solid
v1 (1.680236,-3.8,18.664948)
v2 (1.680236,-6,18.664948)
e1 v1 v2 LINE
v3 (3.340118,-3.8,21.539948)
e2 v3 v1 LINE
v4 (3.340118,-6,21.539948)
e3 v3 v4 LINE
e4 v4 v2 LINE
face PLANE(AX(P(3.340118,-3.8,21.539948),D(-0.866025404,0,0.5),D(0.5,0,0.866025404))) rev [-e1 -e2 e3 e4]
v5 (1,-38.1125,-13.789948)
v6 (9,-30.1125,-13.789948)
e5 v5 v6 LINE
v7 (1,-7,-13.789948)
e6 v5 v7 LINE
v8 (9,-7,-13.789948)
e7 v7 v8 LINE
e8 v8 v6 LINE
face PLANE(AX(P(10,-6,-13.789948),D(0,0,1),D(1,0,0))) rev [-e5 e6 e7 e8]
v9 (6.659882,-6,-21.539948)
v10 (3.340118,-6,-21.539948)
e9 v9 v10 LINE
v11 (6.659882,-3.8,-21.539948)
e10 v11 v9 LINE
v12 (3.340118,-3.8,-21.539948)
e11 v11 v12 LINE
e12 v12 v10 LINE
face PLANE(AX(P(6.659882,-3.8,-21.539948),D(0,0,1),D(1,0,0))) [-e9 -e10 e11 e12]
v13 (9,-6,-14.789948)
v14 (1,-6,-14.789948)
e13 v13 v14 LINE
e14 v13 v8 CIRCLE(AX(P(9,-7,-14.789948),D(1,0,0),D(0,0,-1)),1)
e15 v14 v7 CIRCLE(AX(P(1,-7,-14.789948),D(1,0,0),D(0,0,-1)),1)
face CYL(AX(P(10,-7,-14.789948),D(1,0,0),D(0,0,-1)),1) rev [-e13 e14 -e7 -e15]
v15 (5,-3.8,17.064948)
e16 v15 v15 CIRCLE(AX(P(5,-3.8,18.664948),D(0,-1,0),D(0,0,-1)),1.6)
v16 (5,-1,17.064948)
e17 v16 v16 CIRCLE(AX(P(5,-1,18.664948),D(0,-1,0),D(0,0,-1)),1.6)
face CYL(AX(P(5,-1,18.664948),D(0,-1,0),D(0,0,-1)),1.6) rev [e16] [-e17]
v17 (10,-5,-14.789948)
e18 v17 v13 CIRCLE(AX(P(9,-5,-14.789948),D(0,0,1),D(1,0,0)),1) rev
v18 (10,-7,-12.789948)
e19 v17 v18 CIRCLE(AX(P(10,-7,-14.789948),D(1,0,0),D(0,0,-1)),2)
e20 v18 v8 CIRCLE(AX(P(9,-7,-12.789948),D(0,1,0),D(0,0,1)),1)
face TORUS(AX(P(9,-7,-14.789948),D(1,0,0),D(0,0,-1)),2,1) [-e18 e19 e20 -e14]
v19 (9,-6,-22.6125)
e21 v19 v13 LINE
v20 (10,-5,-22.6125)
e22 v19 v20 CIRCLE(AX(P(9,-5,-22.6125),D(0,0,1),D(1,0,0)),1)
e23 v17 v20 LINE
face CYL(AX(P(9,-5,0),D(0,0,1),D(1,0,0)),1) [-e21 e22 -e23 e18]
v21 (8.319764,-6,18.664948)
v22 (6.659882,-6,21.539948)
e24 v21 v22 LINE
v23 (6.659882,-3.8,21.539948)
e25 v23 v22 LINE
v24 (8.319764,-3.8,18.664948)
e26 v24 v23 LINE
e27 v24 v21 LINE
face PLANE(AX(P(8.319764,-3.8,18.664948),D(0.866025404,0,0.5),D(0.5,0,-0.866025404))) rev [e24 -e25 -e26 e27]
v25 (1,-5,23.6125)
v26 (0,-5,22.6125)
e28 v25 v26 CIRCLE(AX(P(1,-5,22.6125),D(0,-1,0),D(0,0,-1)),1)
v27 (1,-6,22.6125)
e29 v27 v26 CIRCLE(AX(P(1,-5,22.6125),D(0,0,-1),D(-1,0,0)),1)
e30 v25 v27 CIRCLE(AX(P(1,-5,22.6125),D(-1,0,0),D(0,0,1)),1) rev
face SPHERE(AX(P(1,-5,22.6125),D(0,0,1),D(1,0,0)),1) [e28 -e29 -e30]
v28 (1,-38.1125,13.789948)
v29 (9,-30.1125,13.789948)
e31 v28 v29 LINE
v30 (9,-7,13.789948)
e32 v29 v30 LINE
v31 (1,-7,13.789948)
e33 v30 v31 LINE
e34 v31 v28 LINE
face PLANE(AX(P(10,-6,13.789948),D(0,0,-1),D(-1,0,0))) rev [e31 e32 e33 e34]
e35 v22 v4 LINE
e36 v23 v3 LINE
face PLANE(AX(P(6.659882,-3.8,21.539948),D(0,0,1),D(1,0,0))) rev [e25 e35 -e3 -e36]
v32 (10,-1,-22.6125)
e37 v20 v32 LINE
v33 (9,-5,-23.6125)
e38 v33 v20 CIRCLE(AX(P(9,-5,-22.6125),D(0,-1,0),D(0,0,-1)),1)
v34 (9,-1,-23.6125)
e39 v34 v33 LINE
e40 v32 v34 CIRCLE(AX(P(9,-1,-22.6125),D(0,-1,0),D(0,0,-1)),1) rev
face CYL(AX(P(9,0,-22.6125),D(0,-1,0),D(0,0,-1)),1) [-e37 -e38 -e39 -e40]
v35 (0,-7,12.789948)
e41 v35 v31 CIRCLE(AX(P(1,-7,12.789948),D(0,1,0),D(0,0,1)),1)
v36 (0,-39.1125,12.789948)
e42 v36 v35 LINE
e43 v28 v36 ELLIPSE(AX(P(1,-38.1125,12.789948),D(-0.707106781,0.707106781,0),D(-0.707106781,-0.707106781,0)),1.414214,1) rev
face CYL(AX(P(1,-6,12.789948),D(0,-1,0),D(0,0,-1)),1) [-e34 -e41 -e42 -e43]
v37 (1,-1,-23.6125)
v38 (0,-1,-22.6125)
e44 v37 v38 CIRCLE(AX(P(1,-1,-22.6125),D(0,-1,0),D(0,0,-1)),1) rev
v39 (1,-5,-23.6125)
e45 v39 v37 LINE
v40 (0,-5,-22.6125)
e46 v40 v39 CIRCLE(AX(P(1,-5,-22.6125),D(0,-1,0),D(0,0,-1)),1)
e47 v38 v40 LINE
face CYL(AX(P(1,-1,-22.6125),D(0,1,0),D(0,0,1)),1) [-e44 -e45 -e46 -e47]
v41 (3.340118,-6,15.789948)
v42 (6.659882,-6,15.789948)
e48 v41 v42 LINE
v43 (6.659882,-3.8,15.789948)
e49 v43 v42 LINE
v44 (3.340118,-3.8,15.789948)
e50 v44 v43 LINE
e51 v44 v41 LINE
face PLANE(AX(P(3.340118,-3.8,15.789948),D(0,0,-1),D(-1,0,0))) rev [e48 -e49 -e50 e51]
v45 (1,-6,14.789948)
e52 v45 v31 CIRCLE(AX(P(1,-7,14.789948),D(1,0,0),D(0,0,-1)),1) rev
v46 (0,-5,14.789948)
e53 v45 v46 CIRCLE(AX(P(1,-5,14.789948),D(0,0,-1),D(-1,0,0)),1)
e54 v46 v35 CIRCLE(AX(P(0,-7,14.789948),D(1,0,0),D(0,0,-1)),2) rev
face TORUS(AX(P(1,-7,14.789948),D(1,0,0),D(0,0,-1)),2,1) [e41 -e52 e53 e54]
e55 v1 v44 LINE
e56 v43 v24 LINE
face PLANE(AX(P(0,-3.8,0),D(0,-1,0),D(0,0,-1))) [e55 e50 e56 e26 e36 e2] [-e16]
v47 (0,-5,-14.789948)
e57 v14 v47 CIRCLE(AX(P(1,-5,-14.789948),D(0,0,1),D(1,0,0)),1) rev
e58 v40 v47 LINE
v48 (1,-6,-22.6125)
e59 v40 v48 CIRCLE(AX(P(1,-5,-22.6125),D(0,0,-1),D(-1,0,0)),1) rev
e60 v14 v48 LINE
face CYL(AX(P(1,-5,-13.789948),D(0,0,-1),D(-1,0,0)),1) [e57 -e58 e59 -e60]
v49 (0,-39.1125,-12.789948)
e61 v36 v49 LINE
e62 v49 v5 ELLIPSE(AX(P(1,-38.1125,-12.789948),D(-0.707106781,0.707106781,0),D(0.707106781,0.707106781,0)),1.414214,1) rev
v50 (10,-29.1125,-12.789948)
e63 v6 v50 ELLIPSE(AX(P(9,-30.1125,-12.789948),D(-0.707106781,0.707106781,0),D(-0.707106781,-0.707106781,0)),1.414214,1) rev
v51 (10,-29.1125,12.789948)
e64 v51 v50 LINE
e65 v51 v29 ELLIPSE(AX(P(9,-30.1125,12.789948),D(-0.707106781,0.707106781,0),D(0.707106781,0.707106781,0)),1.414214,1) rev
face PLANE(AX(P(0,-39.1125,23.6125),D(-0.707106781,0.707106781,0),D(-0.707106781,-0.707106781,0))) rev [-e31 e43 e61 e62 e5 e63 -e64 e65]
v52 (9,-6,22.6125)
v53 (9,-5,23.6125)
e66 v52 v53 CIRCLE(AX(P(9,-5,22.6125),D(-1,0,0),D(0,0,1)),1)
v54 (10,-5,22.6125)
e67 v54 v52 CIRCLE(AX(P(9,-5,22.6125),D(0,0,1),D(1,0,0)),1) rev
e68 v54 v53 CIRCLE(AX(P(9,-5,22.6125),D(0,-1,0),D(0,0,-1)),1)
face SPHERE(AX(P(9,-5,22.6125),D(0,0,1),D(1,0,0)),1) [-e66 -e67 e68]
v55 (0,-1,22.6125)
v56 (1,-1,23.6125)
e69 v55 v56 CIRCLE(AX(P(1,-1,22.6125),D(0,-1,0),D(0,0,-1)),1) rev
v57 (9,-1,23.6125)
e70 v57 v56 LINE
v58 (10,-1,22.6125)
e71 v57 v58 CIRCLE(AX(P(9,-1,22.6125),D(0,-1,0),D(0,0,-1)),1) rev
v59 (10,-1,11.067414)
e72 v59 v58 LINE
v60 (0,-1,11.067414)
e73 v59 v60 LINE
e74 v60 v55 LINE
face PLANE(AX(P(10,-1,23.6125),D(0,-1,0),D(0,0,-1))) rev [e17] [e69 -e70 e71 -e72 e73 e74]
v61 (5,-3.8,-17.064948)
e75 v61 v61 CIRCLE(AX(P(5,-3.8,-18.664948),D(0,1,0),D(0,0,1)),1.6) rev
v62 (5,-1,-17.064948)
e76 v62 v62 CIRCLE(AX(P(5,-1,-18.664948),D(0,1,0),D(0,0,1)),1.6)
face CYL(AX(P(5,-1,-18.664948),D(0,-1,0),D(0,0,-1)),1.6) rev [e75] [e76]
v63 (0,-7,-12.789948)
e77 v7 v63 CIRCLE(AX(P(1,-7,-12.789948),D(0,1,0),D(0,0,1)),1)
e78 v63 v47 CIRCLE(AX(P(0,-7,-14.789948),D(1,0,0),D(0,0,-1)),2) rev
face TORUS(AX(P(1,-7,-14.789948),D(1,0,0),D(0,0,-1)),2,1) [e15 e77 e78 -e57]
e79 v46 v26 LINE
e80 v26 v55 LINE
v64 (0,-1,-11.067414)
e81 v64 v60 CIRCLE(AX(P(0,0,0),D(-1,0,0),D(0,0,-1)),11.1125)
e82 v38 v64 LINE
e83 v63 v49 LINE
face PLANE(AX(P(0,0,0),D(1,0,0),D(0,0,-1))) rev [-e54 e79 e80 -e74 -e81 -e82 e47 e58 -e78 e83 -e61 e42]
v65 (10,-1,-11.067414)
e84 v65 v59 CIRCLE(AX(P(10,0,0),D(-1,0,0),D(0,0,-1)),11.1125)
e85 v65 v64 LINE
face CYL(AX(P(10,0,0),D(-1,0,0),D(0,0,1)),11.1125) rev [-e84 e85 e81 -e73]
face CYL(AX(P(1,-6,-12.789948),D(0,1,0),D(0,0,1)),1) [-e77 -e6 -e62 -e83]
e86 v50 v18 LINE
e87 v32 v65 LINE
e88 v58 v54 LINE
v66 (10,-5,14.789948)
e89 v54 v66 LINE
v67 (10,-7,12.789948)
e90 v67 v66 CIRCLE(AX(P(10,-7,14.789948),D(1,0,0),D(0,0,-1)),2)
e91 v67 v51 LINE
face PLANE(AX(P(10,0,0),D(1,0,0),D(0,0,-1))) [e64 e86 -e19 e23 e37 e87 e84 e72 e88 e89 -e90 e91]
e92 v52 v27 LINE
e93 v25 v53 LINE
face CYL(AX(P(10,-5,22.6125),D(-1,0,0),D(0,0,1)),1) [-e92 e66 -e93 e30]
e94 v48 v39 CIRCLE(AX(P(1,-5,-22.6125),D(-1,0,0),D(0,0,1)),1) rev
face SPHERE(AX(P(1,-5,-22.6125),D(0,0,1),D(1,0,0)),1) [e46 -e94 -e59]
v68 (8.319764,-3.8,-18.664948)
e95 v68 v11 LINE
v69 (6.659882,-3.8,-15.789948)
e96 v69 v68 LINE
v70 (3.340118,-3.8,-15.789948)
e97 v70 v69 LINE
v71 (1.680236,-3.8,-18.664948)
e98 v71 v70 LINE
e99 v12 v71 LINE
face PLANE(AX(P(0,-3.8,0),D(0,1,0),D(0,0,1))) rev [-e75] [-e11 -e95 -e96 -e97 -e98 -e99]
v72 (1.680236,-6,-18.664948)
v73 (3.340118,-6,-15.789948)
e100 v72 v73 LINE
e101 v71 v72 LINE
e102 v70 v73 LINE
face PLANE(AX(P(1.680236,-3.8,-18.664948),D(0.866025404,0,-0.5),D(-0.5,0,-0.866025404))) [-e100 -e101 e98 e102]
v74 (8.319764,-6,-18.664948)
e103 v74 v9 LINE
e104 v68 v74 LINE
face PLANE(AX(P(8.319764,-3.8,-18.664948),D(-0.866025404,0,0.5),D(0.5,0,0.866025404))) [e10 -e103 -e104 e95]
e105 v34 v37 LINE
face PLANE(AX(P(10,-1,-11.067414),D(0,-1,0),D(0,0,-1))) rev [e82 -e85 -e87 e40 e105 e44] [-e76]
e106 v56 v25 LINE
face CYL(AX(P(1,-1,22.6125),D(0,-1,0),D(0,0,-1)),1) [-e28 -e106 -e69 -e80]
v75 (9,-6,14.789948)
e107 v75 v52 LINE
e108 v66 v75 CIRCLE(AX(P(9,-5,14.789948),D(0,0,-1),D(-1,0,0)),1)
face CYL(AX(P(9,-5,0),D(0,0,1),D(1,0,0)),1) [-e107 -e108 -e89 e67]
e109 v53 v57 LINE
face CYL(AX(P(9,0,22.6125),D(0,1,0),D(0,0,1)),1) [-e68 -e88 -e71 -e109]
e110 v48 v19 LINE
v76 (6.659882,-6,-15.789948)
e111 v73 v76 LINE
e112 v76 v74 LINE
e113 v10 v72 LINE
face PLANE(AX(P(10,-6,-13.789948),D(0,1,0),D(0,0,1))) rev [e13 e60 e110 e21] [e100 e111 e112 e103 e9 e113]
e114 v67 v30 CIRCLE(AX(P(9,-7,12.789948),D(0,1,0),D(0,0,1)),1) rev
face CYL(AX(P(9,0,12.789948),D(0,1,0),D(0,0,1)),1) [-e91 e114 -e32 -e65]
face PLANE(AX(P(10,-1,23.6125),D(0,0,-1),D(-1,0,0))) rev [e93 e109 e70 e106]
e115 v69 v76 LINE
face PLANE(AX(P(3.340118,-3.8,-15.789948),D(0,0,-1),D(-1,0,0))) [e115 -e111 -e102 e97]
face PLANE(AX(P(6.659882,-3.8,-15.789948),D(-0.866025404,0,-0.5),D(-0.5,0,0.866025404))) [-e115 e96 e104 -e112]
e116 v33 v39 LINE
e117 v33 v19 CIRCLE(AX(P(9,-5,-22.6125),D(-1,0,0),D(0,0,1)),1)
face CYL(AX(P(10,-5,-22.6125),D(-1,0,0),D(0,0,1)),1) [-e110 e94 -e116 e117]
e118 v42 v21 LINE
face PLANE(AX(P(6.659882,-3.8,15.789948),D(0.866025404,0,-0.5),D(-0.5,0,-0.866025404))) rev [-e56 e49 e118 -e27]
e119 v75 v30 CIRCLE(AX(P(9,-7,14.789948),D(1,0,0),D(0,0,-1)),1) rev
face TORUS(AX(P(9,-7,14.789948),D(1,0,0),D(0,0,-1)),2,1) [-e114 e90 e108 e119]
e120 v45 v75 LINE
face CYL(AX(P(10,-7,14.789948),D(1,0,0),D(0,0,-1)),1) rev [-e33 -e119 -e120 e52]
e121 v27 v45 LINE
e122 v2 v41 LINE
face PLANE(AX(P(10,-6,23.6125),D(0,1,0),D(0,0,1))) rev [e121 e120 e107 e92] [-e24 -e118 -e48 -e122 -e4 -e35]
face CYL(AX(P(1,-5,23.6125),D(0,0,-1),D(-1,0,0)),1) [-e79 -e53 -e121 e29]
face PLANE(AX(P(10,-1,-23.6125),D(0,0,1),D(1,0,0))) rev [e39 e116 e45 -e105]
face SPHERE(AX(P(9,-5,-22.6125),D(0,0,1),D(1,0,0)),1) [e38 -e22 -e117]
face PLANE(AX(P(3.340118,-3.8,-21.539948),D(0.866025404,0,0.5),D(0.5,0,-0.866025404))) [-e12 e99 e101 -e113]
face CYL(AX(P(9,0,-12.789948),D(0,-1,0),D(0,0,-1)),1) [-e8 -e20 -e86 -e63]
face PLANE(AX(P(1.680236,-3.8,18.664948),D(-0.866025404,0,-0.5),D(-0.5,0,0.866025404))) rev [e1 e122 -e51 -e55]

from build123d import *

# Parameters (mm, degrees)
CLAMP_EXTRUDE_DEPTH = 10
CUT_EXTRUDE3_DEPTH  = 56.03390543
FILLET2_R           = 1
FILLET3_R           = 1
CUT_EXTRUDE4_DEPTH  = 2.2
HOLE_5_R            = 1.6
CUT_EXTRUDE5_DEPTH  = 42.880637682


with BuildPart() as part:
    # Sketch4 → Clamp Extrude (new body)
    with BuildSketch(Plane(origin=(0, 0, 0), x_dir=(0, 0, -1), z_dir=(1, 0, 0))):
        with BuildLine():
            Line((-23.612500003, -1), (-23.612500003, -6))
            Line((-23.612500003, -6), (-13.789947652, -6))
            Line((-13.789947652, -6), (-13.789947652, -39.1125))
            Line((-13.789947652, -39.1125), (13.789947652, -39.1125))
            Line((13.789947652, -39.1125), (13.789947652, -6))
            Line((13.789947652, -6), (23.612500003, -6))
            Line((23.612500003, -6), (23.612500003, -1))
            Line((23.612500003, -1), (11.067414163, -1))
            ThreePointArc((11.067414163, -1), (0, -11.1125), (-11.067414163, -1))
            Line((-11.067414163, -1), (-23.612500003, -1))
        make_face()
    extrude(amount=CLAMP_EXTRUDE_DEPTH)

    # Sketch10 → Cut-Extrude3 (cut, through all)
    with BuildSketch(Plane(origin=(0, 0, -13.789947652), x_dir=(-1, 0, 0), z_dir=(0, 0, -1))):
        Polygon((0, -39.1125), (-10, -29.1125), (-10, -39.1125), align=None)
    extrude(amount=-CUT_EXTRUDE3_DEPTH, mode=Mode.SUBTRACT)

    # Fillet2
    fillet2_edges = [part.edges().sort_by_distance(p)[0] for p in [
        (0, -6, 18.701223827),
        (0, -6, -18.701223827),
        (0, -22.55625, -13.789947652),
        (0, -22.55625, 13.789947652),
        (10, -6, -18.701223827),
        (5, -6, 13.789947652),
        (5, -6, 23.612500003),
        (5, -6, -23.612500003),
        (5, -6, -13.789947652),
        (10, -17.55625, -13.789947652),
        (10, -6, 18.701223827),
        (10, -17.55625, 13.789947652),
    ]]
    fillet(fillet2_edges, radius=FILLET2_R)

    # Fillet3
    # the kernel refuses this fillet: 1 mm, written as the material it takes off along each edge
    with BuildSketch(Plane(origin=(1, -5, 22.612500003), x_dir=(-1, 0, 0), z_dir=(0, 0, 1))) as fillet3_piece_1_section:
        Polygon((0, 0), (FILLET3_R, 0), (FILLET3_R, FILLET3_R), (0, FILLET3_R), align=None)
    fillet3_piece_1 = extrude(amount=FILLET3_R, mode=Mode.PRIVATE)
    fillet3_piece_1 = fillet3_piece_1 - Plane(origin=(1, -5, 22.612500003), x_dir=(0.7071067811865475, 0.7071067811865475, 0), z_dir=(0, 0, 1)) * Sphere(FILLET3_R, mode=Mode.PRIVATE)
    add(fillet3_piece_1, mode=Mode.SUBTRACT)
    with BuildSketch(Plane(origin=(9, -5, 22.612500003), x_dir=(1, 0, 0), z_dir=(0, 0, 1))) as fillet3_piece_2_section:
        Polygon((0, 0), (FILLET3_R, 0), (FILLET3_R, -FILLET3_R), (0, -FILLET3_R), align=None)
    fillet3_piece_2 = extrude(amount=FILLET3_R, mode=Mode.PRIVATE)
    fillet3_piece_2 = fillet3_piece_2 - Plane(origin=(9, -5, 22.612500003), x_dir=(-0.7071067811865475, 0.7071067811865475, 0), z_dir=(0, 0, 1)) * Sphere(FILLET3_R, mode=Mode.PRIVATE)
    add(fillet3_piece_2, mode=Mode.SUBTRACT)
    with BuildSketch(Plane(origin=(9, -5, -22.612500003), x_dir=(0, 0, -1), z_dir=(1, 0, 0))) as fillet3_piece_3_section:
        Polygon((0, 0), (FILLET3_R, 0), (FILLET3_R, -FILLET3_R), (0, -FILLET3_R), align=None)
    fillet3_piece_3 = extrude(amount=FILLET3_R, mode=Mode.PRIVATE)
    fillet3_piece_3 = fillet3_piece_3 - Plane(origin=(9, -5, -22.612500003), x_dir=(0, 0.7071067811865475, 0.7071067811865475), z_dir=(1, 0, 0)) * Sphere(FILLET3_R, mode=Mode.PRIVATE)
    add(fillet3_piece_3, mode=Mode.SUBTRACT)
    with BuildSketch(Plane(origin=(1, -5, -22.612500003), x_dir=(0, 0, -1), z_dir=(-1, 0, 0))) as fillet3_piece_4_section:
        Polygon((0, 0), (FILLET3_R, 0), (FILLET3_R, FILLET3_R), (0, FILLET3_R), align=None)
    fillet3_piece_4 = extrude(amount=FILLET3_R, mode=Mode.PRIVATE)
    fillet3_piece_4 = fillet3_piece_4 - Plane(origin=(1, -5, -22.612500003), x_dir=(0, 0.7071067811865475, 0.7071067811865475), z_dir=(-1, 0, 0)) * Sphere(FILLET3_R, mode=Mode.PRIVATE)
    add(fillet3_piece_4, mode=Mode.SUBTRACT)
    with BuildSketch(Plane(origin=(0, 1.5, 23.612500003), x_dir=(1, 0, 0), z_dir=(0, -1, 0)), Plane(origin=(10, -5, -23.612500003), x_dir=(0, 0, 1), z_dir=(0, 1, 0))) as fillet3_piece_5:
        with BuildLine():
            CenterArc((FILLET3_R, -FILLET3_R), FILLET3_R, 90, 90)
            Line((0, -FILLET3_R), (0, 0))
            Line((0, 0), (FILLET3_R, 0))
        make_face()
    extrude(amount=6.5, mode=Mode.SUBTRACT)
    with BuildSketch(Plane(origin=(10, 1.5, 23.612500003), x_dir=(-1, 0, 0), z_dir=(0, -1, 0)), Plane(origin=(0, -5, -23.612500003), x_dir=(0, 0, 1), z_dir=(0, 1, 0))) as fillet3_piece_6:
        with BuildLine():
            CenterArc((FILLET3_R, FILLET3_R), FILLET3_R, 180, 90)
            Line((0, FILLET3_R), (0, 0))
            Line((0, 0), (FILLET3_R, 0))
        make_face()
    extrude(amount=6.5, mode=Mode.SUBTRACT)

    # Hole → Cut-Extrude4 (cut)
    with BuildSketch(Plane.XZ.offset(6)):
        Polygon((8.319764048, 18.664947652), (6.659882024, 21.539947652), (3.340117976, 21.539947652), (1.680235952, 18.664947652), (3.340117976, 15.789947652), (6.659882024, 15.789947652), align=None)
        Polygon((6.659882024, -15.789947652), (8.319764048, -18.664947652), (6.659882024, -21.539947652), (3.340117976, -21.539947652), (1.680235952, -18.664947652), (3.340117976, -15.789947652), align=None)
    extrude(amount=-CUT_EXTRUDE4_DEPTH, mode=Mode.SUBTRACT)

    # Hole<5> → Cut-Extrude5 (cut, through all)
    with BuildSketch(Plane.XZ.offset(6)):
        with Locations(Location((5, 18.664947652, 0), (0, 0, 270))):
            Circle(HOLE_5_R)
        with Locations(Location((5, -18.664947652, 0), (0, 0, 90))):
            Circle(HOLE_5_R)
    extrude(amount=-CUT_EXTRUDE5_DEPTH, mode=Mode.SUBTRACT)


solid = part.part
